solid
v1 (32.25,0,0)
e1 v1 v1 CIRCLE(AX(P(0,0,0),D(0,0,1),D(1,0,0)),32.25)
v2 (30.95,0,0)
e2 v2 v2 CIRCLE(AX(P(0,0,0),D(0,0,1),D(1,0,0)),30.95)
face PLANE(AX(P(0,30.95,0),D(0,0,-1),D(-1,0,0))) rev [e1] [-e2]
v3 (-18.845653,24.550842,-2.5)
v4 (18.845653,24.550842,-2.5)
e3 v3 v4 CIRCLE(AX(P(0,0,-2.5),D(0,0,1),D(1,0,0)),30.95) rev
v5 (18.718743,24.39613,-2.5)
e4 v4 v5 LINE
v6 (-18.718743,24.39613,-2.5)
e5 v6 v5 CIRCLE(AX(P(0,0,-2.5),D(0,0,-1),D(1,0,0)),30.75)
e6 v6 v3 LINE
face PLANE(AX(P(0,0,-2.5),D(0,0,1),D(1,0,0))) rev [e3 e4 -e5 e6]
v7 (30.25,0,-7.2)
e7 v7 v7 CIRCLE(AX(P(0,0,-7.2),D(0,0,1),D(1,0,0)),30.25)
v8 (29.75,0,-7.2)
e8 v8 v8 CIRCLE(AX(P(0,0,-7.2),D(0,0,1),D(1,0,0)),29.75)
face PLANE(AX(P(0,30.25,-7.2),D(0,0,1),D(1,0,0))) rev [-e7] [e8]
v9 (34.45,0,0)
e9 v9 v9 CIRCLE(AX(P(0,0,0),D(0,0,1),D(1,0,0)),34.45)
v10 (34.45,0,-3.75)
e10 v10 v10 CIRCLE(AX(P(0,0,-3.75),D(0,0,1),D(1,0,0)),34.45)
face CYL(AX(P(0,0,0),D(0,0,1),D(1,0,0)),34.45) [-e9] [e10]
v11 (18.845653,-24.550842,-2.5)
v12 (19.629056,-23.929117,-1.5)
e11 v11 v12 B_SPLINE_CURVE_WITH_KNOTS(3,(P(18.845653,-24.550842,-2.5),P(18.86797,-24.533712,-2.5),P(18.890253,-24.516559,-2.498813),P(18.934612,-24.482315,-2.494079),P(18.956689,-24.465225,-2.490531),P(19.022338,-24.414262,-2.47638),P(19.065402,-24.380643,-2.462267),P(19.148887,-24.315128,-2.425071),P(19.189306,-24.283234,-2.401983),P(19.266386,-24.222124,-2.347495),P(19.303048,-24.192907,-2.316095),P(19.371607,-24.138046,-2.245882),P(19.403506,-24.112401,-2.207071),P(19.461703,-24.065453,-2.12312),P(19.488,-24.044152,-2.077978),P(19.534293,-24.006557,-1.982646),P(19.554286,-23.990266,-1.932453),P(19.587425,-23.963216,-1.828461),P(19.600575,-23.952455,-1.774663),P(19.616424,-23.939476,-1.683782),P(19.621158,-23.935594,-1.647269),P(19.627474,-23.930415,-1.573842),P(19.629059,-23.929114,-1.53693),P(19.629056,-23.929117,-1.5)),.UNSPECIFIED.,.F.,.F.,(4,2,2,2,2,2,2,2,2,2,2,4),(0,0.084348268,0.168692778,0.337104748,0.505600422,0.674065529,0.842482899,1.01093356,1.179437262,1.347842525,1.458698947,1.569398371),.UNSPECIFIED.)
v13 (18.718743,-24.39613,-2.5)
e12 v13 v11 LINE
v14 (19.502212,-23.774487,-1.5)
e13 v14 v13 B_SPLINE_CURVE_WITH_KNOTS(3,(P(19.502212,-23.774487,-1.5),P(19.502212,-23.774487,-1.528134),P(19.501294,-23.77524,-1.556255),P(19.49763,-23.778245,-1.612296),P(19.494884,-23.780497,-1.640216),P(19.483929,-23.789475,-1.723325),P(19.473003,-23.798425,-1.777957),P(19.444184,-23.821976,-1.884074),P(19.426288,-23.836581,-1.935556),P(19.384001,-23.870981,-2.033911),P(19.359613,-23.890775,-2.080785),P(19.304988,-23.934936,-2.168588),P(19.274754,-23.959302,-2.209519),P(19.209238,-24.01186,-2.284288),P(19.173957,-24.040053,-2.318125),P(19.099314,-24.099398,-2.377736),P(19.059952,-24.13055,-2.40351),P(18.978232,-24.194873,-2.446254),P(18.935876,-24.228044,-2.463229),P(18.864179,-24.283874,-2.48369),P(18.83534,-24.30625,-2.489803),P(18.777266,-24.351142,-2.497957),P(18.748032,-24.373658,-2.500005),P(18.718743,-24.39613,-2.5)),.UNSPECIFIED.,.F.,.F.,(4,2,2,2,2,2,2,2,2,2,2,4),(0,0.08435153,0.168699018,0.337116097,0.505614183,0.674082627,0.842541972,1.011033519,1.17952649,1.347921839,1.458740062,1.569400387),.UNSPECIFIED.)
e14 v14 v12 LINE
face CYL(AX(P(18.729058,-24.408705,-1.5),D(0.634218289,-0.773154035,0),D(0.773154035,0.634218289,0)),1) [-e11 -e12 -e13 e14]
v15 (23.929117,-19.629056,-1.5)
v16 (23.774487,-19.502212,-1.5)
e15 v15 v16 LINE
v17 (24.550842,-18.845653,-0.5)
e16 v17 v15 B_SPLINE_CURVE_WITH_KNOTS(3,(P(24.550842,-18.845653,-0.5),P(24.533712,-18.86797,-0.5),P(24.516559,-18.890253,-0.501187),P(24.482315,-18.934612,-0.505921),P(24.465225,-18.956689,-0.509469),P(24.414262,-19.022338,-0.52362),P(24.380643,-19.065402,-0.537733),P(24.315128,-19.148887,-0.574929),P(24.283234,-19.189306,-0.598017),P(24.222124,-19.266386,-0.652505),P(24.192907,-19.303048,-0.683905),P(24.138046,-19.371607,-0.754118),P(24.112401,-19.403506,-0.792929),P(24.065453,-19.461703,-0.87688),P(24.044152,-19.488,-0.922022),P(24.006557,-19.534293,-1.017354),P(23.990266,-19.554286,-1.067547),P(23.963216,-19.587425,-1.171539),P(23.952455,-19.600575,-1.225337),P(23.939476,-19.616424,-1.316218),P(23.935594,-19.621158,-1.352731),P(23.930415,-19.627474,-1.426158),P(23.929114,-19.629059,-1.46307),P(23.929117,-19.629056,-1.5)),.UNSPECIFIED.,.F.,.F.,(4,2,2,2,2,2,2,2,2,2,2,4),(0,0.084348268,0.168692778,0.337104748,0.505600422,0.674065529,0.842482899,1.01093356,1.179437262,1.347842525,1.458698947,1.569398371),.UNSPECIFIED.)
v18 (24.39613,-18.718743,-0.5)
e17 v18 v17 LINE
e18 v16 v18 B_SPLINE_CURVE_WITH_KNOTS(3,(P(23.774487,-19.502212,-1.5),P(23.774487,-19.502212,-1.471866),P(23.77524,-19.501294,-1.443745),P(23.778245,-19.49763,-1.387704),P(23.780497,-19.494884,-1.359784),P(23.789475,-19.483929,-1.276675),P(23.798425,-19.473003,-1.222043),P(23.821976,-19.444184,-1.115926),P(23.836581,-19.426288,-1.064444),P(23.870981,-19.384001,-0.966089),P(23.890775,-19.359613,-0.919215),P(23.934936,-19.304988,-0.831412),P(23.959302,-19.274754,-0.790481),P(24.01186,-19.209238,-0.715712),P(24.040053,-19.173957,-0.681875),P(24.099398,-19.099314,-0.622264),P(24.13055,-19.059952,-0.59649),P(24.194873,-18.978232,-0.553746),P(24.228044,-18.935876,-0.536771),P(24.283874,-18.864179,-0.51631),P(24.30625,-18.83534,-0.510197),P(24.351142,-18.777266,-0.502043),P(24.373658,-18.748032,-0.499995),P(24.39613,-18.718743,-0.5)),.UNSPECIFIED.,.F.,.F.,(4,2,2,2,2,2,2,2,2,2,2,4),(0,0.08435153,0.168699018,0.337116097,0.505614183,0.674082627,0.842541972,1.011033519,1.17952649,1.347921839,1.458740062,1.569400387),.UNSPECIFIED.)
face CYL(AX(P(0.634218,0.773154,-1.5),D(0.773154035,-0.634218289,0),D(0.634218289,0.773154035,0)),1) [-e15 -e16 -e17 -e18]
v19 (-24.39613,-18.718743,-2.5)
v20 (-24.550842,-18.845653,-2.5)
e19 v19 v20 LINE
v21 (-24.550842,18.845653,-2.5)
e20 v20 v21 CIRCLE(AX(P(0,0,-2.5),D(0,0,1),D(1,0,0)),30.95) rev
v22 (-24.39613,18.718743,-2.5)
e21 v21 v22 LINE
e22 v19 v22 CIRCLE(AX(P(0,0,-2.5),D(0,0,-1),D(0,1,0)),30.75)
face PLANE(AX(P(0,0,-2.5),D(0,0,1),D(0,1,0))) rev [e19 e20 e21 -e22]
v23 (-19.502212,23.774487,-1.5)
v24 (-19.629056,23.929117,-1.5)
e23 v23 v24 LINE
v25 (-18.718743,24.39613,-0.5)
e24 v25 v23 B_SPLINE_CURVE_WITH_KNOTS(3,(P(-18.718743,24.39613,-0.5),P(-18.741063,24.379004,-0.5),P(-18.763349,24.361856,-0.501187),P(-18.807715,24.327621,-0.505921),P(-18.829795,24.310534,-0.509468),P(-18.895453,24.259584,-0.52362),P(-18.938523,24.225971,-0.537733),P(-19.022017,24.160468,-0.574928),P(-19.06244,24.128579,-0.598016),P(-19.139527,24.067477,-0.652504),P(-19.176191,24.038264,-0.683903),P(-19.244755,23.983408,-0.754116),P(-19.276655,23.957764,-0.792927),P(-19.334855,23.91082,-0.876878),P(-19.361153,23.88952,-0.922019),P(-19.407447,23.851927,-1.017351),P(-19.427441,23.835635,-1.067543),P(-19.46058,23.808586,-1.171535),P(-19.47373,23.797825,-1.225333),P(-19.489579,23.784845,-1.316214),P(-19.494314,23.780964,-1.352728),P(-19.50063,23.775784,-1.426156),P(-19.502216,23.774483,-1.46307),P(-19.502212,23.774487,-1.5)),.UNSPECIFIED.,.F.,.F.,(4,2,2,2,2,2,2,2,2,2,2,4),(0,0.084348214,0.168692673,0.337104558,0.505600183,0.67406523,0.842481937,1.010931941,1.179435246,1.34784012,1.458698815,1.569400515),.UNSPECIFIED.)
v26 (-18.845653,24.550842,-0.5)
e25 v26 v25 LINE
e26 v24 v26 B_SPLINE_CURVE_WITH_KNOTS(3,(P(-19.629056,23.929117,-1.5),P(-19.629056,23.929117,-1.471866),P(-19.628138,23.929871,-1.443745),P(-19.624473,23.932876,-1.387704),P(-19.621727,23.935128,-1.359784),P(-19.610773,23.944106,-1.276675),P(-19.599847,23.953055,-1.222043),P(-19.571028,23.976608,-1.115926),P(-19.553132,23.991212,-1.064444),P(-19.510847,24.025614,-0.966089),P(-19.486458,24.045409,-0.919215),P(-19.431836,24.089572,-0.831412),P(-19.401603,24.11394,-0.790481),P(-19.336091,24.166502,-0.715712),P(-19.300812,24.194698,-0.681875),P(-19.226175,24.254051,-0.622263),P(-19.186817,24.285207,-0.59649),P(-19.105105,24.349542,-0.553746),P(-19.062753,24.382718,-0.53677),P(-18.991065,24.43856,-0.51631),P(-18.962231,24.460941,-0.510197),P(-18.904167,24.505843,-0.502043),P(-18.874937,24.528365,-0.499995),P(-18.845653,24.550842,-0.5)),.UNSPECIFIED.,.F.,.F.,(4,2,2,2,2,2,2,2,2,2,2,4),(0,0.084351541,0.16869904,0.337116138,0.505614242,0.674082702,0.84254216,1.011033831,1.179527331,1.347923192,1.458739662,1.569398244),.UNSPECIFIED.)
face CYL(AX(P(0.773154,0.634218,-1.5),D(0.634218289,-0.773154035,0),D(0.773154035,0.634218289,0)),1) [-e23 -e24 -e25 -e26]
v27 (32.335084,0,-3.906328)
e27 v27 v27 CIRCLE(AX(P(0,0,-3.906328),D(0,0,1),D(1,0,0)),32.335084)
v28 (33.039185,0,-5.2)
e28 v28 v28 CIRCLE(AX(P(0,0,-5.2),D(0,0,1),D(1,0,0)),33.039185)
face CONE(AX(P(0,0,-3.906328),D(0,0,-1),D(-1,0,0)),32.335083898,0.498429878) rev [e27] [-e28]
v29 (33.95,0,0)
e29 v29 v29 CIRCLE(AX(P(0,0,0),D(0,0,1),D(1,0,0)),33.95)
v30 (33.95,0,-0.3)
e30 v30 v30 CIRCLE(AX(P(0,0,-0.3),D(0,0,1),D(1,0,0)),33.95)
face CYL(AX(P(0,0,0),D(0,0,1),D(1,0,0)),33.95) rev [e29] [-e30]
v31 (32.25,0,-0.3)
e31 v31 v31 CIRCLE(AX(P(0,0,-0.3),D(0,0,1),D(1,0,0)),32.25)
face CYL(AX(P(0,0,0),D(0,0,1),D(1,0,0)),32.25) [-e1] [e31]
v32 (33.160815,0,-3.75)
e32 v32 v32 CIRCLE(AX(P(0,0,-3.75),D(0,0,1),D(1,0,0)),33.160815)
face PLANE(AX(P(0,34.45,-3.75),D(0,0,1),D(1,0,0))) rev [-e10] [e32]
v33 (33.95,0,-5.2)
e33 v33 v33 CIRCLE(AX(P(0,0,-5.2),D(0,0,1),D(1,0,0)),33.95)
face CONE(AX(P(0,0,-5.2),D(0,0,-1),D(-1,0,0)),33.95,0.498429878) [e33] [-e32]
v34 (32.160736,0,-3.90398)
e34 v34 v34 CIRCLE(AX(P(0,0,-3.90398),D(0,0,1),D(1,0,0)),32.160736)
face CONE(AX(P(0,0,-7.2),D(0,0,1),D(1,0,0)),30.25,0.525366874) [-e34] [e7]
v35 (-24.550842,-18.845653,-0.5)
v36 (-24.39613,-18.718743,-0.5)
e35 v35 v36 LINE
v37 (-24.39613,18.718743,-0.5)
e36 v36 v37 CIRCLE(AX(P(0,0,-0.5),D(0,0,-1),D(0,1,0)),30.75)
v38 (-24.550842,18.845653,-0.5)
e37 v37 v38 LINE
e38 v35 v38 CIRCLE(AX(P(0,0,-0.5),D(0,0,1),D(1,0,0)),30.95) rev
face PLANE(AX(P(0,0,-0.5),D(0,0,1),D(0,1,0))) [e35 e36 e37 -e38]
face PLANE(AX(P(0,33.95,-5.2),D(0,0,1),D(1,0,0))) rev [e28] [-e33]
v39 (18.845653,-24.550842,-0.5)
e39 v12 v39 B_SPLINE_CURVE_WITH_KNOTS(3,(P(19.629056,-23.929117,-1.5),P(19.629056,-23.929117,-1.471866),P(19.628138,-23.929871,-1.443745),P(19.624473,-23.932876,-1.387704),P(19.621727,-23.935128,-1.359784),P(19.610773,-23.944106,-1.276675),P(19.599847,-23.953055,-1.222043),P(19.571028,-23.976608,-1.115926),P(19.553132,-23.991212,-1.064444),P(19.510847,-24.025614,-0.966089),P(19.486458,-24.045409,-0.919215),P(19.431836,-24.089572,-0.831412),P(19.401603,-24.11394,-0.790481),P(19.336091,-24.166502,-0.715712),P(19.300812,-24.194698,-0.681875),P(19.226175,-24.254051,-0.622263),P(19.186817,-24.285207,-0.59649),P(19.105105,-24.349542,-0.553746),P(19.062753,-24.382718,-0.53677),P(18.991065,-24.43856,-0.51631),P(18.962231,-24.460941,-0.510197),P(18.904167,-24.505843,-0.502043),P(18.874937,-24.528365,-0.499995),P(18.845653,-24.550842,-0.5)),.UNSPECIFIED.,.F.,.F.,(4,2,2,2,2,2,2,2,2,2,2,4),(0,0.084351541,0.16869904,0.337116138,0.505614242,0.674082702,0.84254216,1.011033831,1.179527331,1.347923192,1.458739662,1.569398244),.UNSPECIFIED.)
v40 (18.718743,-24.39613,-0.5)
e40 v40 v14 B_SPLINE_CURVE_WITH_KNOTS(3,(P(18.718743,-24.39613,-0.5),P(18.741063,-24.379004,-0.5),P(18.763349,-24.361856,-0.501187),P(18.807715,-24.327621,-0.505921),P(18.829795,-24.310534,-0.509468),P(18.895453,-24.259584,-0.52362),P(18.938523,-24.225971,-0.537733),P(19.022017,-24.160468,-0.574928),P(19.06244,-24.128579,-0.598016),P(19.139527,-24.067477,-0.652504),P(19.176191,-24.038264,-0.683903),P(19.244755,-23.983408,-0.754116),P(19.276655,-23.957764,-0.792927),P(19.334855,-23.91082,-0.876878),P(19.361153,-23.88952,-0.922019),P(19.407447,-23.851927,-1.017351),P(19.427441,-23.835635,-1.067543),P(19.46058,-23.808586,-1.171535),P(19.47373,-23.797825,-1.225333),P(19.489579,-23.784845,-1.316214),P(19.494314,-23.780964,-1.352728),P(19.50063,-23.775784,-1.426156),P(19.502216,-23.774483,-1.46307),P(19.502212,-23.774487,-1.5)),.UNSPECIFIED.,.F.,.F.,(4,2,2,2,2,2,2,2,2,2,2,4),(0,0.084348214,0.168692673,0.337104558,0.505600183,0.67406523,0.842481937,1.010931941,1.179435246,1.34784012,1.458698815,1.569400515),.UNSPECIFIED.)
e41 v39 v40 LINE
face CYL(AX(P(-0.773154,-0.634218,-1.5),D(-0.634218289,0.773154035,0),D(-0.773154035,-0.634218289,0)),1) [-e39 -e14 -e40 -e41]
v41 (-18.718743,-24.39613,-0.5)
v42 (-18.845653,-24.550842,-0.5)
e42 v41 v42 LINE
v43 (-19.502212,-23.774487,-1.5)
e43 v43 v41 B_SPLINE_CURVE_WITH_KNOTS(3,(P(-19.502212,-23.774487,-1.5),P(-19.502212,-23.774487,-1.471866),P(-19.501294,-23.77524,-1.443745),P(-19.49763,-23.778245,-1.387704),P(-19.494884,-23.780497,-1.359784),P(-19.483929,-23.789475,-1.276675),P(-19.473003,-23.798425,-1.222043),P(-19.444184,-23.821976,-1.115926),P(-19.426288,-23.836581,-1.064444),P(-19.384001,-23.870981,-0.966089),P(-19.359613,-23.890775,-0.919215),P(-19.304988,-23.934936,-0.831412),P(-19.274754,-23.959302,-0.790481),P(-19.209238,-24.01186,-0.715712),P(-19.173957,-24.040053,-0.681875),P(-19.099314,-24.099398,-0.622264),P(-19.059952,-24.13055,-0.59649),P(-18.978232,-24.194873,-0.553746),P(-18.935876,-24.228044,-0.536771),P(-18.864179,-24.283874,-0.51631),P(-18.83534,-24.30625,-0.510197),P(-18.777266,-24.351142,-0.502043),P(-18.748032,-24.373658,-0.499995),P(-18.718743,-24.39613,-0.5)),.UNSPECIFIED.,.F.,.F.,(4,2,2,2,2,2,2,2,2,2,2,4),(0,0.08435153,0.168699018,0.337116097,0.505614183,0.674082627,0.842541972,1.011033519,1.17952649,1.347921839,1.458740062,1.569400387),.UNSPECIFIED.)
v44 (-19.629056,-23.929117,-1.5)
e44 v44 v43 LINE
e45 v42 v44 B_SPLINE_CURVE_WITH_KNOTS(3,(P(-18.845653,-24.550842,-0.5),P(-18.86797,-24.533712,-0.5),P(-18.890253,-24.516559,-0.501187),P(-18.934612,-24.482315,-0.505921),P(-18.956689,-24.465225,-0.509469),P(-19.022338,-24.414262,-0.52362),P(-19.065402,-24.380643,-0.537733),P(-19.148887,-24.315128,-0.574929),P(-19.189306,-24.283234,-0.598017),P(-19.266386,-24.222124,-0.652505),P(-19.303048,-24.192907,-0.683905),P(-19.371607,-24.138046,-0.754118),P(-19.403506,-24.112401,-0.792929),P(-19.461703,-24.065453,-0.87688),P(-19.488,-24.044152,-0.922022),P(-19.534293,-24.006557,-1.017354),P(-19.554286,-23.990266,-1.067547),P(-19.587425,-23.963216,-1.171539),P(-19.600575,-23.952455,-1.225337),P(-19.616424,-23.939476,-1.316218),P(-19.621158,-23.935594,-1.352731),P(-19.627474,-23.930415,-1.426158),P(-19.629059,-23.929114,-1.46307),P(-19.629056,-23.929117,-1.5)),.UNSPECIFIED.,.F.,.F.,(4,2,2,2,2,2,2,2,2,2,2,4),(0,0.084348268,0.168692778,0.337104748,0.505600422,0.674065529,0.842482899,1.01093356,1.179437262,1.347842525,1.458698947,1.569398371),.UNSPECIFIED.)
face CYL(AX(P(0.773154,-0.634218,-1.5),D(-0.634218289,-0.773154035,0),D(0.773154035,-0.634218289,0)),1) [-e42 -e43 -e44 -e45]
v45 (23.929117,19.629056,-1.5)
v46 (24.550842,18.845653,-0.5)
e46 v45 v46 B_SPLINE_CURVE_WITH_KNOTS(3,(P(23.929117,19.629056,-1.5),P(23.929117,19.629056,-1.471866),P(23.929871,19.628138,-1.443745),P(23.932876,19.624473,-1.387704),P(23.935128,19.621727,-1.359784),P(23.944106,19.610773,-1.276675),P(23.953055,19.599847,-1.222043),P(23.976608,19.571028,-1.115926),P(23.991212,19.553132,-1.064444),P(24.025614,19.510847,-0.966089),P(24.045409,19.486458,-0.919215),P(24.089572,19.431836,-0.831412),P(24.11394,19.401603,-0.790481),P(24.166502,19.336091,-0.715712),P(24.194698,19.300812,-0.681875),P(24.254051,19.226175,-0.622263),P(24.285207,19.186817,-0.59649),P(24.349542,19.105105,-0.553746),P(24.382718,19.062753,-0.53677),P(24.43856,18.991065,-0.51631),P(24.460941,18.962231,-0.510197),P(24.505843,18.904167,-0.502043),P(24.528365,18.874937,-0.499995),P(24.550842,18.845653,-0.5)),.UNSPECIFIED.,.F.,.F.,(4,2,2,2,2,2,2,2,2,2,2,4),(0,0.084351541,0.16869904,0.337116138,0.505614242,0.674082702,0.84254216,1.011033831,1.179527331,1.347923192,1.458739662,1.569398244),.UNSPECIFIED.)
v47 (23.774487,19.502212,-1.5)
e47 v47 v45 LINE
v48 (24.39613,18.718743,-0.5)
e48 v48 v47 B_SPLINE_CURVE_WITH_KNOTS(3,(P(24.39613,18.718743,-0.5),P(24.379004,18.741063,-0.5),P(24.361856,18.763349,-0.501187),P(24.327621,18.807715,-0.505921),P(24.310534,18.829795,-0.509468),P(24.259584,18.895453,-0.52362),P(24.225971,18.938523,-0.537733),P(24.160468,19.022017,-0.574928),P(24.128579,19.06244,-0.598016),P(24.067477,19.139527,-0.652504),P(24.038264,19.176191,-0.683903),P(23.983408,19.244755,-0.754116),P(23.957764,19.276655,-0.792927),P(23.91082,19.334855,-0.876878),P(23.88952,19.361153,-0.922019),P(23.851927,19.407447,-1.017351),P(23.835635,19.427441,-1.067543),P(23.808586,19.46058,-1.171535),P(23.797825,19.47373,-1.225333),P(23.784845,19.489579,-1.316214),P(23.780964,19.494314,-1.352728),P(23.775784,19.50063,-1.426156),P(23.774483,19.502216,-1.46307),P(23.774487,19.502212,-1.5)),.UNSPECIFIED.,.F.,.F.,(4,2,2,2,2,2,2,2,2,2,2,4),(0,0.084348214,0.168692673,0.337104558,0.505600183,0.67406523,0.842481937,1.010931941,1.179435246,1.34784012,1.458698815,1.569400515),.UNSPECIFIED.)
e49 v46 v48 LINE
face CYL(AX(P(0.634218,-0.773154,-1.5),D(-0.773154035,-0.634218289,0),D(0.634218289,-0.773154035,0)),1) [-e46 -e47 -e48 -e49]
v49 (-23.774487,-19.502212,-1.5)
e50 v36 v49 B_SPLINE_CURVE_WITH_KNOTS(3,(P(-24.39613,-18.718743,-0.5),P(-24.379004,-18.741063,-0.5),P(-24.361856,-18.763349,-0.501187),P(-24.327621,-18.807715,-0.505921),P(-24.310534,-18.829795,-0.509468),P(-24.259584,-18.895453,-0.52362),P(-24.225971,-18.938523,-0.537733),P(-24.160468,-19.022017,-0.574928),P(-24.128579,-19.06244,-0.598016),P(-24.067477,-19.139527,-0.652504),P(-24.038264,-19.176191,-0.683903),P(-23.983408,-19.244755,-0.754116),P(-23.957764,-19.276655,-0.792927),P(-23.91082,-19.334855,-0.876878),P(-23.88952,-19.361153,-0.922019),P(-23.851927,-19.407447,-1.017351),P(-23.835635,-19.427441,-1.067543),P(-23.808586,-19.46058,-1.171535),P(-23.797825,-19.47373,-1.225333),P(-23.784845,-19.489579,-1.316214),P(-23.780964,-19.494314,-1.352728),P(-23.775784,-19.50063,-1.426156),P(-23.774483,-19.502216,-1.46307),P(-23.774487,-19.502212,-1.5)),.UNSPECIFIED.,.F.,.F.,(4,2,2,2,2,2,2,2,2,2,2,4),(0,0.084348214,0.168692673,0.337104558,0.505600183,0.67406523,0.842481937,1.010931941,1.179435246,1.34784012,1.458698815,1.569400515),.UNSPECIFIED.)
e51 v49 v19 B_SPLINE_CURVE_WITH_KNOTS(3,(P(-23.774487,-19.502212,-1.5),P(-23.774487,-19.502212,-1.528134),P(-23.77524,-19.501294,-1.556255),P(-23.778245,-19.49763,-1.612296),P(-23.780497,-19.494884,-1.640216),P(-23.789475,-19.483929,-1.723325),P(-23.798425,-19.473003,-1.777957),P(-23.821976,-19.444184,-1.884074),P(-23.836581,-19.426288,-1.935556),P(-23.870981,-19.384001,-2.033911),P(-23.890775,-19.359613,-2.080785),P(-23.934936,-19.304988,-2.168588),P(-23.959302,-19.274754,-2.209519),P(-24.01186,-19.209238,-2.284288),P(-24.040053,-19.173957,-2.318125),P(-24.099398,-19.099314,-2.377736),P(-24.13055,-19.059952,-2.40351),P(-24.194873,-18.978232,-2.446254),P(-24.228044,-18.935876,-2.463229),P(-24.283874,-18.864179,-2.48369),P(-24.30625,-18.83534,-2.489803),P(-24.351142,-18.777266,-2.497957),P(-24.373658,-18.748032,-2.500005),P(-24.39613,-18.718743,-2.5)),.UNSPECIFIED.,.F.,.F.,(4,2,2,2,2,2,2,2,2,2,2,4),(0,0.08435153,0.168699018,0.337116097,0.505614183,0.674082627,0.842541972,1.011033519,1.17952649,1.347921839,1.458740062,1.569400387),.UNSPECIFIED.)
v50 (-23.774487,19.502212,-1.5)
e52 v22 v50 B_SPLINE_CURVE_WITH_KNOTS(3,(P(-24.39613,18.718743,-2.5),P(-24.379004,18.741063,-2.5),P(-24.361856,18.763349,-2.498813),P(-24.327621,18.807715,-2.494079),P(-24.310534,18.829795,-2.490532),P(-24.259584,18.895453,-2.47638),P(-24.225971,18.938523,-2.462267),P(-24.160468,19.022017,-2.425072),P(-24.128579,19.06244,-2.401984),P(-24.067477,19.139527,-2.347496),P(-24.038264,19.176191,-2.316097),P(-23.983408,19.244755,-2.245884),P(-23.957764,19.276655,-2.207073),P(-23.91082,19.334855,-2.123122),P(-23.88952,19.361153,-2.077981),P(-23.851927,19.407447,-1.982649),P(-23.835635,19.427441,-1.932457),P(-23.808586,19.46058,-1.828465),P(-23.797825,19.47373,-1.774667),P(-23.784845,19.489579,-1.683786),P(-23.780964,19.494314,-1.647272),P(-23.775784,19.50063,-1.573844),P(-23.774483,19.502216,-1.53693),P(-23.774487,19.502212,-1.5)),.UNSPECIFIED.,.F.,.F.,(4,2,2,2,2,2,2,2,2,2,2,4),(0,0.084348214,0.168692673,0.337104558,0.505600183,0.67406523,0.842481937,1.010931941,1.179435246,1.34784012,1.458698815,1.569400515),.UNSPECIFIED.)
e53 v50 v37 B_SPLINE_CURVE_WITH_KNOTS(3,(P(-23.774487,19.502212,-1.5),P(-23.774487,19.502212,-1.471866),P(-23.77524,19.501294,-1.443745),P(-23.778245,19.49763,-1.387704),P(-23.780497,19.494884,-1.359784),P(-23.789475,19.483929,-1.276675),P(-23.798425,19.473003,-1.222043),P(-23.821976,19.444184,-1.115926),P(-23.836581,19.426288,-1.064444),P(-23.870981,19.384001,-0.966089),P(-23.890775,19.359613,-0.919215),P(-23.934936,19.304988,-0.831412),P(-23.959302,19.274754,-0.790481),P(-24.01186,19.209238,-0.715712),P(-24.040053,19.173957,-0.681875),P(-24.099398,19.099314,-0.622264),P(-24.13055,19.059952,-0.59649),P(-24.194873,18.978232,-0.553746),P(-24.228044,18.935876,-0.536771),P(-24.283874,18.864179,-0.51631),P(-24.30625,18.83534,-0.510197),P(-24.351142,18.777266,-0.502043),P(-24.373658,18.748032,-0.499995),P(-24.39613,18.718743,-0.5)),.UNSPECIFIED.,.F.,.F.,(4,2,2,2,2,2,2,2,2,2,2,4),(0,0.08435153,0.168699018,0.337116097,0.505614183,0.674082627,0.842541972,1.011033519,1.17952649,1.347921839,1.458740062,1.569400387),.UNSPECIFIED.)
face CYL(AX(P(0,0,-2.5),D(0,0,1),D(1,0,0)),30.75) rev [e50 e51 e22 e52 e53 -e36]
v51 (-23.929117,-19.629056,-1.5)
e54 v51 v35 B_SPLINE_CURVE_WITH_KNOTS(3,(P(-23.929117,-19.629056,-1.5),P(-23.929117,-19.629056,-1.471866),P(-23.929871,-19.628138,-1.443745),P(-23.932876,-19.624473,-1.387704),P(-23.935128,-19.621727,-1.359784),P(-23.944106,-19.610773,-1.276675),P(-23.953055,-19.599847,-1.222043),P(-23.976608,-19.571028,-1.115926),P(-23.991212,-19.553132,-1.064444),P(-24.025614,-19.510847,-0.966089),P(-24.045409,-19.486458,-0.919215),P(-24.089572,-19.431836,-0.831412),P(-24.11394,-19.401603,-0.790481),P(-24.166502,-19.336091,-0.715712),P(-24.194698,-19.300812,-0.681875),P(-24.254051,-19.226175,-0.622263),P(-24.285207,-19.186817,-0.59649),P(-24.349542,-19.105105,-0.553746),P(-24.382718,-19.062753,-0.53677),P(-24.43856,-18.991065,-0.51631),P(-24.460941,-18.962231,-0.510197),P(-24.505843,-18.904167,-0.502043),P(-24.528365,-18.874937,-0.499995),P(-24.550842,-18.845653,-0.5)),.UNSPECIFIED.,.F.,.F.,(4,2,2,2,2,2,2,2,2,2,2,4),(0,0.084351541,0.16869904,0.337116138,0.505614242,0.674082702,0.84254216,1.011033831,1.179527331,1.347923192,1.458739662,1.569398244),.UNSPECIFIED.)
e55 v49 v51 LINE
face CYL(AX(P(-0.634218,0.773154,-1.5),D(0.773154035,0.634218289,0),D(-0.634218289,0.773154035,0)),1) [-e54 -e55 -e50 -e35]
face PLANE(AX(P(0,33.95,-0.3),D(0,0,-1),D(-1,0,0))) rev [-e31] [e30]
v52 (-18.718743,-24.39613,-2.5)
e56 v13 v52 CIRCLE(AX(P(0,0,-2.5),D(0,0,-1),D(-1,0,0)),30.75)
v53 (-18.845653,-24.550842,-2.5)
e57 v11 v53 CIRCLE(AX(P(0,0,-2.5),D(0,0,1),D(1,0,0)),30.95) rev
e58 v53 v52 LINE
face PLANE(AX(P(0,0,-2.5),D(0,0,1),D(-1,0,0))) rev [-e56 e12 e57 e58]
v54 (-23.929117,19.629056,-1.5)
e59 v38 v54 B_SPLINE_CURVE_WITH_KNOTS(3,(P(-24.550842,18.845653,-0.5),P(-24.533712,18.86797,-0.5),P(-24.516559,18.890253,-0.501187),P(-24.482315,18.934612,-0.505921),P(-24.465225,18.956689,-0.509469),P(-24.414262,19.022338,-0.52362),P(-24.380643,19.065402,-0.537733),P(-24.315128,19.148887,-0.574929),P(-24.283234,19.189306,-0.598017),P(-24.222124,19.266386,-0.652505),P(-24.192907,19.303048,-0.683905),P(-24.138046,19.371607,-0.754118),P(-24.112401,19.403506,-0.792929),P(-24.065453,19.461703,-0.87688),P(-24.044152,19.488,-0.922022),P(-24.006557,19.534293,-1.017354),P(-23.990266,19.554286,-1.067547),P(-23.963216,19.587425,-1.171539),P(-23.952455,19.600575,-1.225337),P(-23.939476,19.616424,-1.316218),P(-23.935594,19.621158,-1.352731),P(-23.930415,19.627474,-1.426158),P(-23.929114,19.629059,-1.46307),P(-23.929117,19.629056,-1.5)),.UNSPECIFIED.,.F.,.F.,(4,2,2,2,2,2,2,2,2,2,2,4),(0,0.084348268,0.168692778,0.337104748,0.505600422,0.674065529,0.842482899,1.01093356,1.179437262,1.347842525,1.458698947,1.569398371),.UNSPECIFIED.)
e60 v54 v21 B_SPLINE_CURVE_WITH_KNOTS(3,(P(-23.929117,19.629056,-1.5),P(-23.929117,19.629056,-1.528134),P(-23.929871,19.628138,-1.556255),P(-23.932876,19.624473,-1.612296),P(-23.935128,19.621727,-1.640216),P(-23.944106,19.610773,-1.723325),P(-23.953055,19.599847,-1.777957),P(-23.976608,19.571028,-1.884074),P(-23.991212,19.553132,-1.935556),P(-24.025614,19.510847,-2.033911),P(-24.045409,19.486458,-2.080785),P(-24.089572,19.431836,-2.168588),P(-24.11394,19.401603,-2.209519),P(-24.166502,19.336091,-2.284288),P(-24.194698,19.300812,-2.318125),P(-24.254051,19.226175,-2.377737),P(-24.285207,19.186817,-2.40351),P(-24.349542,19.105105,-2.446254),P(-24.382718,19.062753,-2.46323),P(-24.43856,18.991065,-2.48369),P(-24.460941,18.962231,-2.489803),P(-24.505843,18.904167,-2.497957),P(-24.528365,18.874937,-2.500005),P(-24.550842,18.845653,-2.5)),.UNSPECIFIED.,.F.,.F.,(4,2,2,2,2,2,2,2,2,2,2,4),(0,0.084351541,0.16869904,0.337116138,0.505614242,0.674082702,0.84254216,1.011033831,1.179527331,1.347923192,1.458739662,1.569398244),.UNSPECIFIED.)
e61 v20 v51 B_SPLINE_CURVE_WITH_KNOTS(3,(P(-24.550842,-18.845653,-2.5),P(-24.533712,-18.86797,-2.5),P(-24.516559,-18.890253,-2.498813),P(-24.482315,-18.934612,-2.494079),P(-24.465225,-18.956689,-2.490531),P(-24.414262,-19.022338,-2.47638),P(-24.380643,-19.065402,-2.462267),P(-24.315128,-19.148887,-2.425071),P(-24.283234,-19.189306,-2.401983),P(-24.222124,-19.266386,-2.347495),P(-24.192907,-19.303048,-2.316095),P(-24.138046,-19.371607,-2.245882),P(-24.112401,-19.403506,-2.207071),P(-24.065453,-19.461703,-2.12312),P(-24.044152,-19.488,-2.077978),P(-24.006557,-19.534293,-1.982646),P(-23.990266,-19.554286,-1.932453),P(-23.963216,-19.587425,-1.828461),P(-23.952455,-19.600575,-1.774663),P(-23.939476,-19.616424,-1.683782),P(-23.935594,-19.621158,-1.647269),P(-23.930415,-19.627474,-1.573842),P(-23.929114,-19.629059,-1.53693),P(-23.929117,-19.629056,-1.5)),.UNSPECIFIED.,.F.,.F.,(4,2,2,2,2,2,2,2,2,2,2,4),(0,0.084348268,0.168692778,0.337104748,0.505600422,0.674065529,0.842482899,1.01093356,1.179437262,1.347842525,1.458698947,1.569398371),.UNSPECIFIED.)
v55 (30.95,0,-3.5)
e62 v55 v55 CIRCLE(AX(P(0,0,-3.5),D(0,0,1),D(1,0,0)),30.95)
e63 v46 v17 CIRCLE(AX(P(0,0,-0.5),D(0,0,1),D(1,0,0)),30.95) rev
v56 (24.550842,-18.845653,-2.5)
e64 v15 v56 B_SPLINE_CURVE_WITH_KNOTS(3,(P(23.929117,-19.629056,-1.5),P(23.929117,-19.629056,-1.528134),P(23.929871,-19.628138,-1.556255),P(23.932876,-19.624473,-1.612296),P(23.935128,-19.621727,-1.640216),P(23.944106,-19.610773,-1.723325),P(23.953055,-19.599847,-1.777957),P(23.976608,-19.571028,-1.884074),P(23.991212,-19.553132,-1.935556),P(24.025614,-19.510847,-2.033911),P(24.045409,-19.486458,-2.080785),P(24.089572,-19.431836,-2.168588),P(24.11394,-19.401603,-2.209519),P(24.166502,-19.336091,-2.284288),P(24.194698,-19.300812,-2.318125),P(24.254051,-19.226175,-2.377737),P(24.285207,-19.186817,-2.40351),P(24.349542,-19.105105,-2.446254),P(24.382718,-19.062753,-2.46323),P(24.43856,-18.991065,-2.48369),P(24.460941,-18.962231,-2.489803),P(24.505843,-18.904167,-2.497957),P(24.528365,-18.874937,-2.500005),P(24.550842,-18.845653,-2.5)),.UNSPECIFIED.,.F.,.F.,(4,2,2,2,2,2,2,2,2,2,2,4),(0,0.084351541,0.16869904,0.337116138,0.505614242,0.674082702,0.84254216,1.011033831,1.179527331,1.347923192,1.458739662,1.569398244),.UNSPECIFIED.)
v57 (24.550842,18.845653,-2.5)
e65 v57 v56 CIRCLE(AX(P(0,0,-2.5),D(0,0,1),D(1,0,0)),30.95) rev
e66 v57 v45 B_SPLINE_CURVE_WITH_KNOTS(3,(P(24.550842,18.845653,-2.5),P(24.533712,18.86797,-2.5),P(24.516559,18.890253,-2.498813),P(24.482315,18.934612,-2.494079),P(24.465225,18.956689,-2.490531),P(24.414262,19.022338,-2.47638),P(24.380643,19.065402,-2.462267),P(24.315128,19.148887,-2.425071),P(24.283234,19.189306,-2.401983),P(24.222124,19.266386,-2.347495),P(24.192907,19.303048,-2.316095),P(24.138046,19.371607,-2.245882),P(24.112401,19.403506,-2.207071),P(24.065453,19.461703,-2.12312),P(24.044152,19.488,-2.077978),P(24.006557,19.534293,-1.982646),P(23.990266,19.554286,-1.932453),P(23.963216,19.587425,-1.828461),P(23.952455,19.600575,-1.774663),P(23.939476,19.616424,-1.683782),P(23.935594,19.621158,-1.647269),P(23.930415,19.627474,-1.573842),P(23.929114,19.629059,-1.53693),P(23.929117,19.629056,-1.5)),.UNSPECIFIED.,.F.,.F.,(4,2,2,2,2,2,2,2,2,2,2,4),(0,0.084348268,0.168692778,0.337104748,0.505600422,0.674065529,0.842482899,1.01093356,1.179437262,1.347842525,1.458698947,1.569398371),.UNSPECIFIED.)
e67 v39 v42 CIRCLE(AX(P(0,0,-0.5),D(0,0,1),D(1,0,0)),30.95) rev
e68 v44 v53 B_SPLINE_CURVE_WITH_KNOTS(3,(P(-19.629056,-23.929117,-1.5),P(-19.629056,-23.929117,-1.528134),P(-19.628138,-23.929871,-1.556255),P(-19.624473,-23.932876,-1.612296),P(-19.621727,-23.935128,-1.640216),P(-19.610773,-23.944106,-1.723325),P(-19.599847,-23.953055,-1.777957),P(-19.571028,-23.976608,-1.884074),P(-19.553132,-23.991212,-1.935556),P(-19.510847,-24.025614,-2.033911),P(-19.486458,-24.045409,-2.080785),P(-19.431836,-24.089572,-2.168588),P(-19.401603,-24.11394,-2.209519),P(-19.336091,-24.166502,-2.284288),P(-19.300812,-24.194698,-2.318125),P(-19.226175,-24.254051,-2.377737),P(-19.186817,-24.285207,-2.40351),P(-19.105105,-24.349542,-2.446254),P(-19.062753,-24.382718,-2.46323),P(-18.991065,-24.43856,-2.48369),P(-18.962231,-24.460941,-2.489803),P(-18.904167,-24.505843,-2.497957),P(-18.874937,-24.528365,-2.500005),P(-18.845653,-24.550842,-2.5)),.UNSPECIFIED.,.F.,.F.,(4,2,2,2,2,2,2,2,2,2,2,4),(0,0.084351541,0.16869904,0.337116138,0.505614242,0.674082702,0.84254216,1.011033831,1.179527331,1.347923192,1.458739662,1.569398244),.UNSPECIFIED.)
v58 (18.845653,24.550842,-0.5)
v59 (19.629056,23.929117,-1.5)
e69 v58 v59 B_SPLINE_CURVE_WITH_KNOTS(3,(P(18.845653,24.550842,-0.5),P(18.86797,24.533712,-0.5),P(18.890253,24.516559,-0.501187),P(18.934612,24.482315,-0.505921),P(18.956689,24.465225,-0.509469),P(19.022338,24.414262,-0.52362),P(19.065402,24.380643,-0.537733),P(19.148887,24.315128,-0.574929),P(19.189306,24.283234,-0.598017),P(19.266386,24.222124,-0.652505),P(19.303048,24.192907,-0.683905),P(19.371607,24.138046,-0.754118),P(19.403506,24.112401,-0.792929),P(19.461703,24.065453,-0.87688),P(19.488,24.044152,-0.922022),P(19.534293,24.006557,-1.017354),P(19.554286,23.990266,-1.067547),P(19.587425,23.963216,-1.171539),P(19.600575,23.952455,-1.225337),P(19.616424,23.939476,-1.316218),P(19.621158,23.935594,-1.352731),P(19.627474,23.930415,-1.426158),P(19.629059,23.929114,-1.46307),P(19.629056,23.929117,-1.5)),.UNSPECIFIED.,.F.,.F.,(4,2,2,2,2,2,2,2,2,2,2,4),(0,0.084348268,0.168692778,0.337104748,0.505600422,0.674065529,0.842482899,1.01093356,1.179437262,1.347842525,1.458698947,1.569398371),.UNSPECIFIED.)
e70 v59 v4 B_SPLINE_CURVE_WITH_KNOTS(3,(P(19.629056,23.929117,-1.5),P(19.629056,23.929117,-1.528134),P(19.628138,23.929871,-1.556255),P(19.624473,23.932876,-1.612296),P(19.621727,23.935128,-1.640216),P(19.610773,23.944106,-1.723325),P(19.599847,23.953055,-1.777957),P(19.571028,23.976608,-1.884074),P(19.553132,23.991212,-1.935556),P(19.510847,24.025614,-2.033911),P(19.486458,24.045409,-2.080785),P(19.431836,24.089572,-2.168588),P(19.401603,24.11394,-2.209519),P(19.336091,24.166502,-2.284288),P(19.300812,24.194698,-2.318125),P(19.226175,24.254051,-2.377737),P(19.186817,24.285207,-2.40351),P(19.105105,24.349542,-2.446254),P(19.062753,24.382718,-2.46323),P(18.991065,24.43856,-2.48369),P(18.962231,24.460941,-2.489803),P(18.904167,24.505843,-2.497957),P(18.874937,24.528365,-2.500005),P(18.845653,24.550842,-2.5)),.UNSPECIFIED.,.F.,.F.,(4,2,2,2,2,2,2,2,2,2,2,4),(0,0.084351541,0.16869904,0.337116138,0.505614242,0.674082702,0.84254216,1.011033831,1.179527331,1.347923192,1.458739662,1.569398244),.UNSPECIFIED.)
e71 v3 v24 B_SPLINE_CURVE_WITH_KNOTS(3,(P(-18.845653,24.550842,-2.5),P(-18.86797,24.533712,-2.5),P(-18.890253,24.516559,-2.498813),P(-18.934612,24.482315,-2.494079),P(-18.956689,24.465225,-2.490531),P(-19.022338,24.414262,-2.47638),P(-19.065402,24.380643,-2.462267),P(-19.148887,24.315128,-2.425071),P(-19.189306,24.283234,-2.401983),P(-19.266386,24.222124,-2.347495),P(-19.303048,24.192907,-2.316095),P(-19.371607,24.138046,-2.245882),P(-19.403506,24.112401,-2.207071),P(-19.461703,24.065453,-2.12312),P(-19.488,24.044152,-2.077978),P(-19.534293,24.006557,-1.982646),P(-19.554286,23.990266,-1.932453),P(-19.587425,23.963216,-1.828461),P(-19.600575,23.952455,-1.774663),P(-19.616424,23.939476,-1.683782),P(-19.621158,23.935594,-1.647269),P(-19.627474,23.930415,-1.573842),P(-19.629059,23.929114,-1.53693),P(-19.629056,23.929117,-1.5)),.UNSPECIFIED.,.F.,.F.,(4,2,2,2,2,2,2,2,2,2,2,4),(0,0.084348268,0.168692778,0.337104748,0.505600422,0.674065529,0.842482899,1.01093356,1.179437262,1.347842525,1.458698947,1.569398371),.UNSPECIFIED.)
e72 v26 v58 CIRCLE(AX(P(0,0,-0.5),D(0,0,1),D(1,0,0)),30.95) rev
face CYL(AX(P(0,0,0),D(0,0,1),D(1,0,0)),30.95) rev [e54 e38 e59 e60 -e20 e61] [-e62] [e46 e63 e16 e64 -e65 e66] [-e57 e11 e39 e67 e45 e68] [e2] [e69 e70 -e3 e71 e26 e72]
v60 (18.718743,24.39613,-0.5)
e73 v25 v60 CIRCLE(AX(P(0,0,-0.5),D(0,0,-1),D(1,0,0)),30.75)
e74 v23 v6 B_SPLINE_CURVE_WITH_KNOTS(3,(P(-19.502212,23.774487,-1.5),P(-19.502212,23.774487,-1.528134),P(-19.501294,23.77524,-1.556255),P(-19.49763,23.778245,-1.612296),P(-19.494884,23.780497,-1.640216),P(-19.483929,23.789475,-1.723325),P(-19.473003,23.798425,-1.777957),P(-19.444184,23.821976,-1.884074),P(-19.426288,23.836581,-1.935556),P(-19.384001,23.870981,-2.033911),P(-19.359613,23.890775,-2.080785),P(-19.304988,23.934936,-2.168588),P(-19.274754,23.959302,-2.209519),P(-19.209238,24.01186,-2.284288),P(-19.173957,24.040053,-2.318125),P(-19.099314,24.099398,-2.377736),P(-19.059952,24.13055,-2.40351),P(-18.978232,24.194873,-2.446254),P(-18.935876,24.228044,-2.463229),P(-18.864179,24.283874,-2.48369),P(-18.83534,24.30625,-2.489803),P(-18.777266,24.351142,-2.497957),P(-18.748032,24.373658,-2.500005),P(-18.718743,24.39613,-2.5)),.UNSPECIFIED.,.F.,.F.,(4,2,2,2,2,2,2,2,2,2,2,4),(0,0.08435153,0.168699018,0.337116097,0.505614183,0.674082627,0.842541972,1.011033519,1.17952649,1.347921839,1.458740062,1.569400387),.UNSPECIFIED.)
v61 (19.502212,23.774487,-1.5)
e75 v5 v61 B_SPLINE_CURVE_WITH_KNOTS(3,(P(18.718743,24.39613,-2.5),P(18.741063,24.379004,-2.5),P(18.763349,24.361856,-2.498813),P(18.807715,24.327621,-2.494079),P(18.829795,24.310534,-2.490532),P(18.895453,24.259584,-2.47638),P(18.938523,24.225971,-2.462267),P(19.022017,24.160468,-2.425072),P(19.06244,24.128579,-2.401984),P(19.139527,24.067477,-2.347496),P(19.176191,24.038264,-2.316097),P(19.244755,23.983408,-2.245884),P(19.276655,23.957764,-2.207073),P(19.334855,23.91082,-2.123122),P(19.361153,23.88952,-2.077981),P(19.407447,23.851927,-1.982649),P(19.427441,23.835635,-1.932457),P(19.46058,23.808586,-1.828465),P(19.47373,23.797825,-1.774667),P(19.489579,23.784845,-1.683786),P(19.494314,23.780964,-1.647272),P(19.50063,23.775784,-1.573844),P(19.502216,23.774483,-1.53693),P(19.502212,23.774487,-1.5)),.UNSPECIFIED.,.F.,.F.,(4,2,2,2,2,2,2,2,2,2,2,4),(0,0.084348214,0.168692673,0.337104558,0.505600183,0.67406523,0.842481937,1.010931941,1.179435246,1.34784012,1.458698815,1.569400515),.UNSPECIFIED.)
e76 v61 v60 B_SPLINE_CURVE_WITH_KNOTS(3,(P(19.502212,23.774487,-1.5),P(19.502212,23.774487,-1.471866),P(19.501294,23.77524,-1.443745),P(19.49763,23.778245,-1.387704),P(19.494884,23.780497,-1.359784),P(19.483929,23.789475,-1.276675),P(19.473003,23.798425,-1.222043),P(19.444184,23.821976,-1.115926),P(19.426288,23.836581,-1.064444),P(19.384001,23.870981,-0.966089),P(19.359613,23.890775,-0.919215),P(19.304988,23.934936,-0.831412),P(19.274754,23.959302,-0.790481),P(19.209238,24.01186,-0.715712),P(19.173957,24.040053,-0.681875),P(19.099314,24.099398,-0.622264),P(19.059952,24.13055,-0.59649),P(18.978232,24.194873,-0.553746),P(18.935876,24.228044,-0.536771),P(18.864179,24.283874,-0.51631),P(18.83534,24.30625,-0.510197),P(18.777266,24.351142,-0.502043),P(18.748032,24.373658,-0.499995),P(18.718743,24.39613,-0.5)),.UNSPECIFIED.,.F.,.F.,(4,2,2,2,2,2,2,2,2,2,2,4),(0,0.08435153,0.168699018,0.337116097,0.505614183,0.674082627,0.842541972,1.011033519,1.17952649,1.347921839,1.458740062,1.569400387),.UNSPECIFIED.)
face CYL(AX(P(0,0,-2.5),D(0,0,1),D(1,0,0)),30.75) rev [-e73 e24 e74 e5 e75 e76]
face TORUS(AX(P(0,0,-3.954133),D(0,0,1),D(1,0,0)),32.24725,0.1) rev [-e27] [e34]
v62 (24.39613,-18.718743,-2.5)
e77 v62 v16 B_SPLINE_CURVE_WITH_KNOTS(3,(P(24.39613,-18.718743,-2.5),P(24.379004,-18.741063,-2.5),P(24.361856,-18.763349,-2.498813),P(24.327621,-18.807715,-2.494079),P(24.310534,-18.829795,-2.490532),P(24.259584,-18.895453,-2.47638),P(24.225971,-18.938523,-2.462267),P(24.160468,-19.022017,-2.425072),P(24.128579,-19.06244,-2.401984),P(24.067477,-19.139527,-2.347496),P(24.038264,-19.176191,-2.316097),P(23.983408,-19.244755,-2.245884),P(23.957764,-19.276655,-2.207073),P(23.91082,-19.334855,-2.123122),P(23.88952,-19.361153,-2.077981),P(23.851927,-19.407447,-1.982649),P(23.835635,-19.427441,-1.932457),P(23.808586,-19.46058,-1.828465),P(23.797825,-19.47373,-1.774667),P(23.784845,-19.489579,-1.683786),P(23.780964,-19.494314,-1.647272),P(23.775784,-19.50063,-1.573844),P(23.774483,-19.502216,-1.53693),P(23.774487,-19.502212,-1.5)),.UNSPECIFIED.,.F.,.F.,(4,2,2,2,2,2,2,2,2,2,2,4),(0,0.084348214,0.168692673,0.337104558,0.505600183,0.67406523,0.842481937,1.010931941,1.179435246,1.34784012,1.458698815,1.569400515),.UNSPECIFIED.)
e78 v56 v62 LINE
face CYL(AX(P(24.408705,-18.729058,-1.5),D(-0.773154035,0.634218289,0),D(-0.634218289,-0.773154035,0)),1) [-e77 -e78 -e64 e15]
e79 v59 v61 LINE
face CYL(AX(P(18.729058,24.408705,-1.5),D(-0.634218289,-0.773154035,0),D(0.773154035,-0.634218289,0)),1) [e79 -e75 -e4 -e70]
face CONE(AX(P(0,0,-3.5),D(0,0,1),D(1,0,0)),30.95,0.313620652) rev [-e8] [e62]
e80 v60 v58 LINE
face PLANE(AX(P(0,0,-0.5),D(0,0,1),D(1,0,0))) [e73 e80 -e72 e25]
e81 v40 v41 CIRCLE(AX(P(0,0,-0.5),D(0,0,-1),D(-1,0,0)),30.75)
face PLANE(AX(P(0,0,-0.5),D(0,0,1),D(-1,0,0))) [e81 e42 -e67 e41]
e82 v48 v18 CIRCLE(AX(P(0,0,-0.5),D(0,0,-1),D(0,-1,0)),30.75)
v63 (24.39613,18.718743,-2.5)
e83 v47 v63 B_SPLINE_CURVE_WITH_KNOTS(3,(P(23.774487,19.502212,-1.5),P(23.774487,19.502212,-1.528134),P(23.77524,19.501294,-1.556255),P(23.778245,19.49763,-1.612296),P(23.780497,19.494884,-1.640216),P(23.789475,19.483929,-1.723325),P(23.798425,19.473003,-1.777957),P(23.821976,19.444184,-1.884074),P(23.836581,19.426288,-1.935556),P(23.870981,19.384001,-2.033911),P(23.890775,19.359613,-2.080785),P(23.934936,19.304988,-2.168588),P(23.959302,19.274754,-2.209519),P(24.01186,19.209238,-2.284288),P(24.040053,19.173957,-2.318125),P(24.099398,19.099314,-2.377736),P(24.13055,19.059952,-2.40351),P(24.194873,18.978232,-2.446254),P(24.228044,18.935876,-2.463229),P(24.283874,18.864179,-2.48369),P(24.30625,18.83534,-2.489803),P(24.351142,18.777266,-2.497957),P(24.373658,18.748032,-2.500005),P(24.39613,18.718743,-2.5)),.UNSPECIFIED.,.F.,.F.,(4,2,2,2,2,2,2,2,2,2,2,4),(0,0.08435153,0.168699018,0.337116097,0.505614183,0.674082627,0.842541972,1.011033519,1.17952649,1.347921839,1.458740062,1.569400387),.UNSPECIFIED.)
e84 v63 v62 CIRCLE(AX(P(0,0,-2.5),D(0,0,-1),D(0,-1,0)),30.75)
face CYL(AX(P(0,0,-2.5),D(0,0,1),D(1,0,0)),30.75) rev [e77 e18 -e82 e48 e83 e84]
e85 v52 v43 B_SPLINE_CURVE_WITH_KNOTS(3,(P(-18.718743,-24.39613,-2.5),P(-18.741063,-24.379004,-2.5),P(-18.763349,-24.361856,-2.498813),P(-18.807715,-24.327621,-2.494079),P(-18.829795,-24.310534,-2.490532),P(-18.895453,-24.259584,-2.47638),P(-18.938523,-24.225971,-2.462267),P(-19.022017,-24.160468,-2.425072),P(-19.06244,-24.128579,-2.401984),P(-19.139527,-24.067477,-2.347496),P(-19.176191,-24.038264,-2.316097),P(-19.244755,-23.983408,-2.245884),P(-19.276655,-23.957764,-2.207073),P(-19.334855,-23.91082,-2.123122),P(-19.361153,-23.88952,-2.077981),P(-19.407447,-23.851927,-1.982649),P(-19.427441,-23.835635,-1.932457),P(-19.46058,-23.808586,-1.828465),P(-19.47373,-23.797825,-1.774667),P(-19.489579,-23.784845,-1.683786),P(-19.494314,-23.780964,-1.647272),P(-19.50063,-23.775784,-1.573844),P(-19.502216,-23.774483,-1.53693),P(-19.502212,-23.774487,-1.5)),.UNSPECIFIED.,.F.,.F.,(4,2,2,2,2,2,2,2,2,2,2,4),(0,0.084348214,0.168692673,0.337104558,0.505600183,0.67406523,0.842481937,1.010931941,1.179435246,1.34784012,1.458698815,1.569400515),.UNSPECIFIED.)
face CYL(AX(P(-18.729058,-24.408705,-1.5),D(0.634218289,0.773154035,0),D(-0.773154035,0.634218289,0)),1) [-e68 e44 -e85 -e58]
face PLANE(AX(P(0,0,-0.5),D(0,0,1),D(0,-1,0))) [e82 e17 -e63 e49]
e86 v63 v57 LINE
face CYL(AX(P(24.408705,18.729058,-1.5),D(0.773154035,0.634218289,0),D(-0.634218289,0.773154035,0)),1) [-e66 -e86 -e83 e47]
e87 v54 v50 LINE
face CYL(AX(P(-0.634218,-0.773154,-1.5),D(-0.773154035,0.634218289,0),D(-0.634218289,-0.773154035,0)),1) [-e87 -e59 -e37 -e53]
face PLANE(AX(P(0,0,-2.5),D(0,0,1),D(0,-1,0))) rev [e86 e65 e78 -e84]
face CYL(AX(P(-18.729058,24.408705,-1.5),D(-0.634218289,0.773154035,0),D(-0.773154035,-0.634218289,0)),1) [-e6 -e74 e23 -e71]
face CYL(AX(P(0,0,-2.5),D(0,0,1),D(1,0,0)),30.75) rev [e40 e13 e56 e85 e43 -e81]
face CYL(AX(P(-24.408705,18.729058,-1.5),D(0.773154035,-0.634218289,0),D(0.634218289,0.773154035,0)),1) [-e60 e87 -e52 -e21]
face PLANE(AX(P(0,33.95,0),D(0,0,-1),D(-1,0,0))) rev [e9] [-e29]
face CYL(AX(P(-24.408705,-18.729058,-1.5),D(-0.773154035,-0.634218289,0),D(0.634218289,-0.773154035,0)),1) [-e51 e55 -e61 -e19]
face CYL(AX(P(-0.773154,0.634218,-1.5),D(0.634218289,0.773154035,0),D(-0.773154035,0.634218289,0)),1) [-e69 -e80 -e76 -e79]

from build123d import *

# Parameters (mm, degrees)
BOSS_EXTRUDE1_DEPTH      = 2
FILLET1_R                = 1
CIRPATTERN1_COUNT        = 4
FILLET1_OF_CIRPATTERN1_R = 1


with BuildPart() as part:
    # Sketch1 → Revolve1 (revolve)
    with BuildSketch(Plane(origin=(0, 0, 0), x_dir=(0, 0, -1), z_dir=(1, 0, 0)), mode=Mode.PRIVATE) as revolve1_sk:
        with BuildLine():
            Line((3.75, 34.45), (3.75, 33.95))
            Line((3.75, 33.95), (3.75, 33.160815003))
            Line((3.75, 33.160815003), (5.2, 33.95))
            Line((5.2, 33.95), (5.2, 33.039184997))
            Line((5.2, 33.039184997), (3.906327923, 32.335083898))
            ThreePointArc((3.906327923, 32.335083898), (3.854141696, 32.248597283), (3.903979583, 32.160736474))
            Line((3.903979583, 32.160736474), (7.2, 30.25))
            Line((7.2, 30.25), (7.2, 29.75))
            Line((7.2, 29.75), (3.5, 30.95))
            Line((3.5, 30.95), (0, 30.95))
            Line((0, 30.95), (0, 32.25))
            Line((0, 32.25), (0.3, 32.25))
            Line((0.3, 32.25), (0.3, 33.95))
            Line((0.3, 33.95), (0, 33.95))
            Line((0, 33.95), (0, 34.45))
            Line((0, 34.45), (3.75, 34.45))
        make_face()
    revolve(revolve1_sk.sketch.rotate(Axis((0, 0, 0), (0, 0, -1)), 90), axis=Axis((0, 0, 0), (0, 0, -1)))

    # Sketch2 → Boss-Extrude1 (add)
    with BuildSketch(Plane.XY.offset(-0.5)):
        with BuildLine():
            Line((-19.502212389, 23.774486575), (-21.5, 26.209921785))
            ThreePointArc((-21.5, 26.209921785), (0, 33.9), (21.5, 26.209921785))
            Line((21.5, 26.209921785), (19.502212389, 23.774486575))
            ThreePointArc((19.502212389, 23.774486575), (0, 30.75), (-19.502212389, 23.774486575))
        make_face()
    boss_extrude1 = extrude(amount=-BOSS_EXTRUDE1_DEPTH)

    # Fillet1
    fillet1_edges = [part.edges().sort_by_distance(p)[0] for p in [
        (-19.565634218, 23.851801979, -2.5),
        (-19.565634218, 23.851801979, -0.5),
        (19.565634218, 23.851801979, -2.5),
        (19.565634218, 23.851801979, -0.5),
    ]]
    fillet(fillet1_edges, radius=FILLET1_R - 0.0001)  # a hair under: the kernel refuses the full size

    # CirPattern1: Boss-Extrude1 ×4 about axis
    cirpattern1_axis = Axis((0, 0, 0), (0, 0, 1))
    for i in range(1, CIRPATTERN1_COUNT):
        add(boss_extrude1.rotate(cirpattern1_axis, i * 360 / CIRPATTERN1_COUNT))

    # Fillet1 of CirPattern1
    fillet1_of_cirpattern1_edges = [part.edges().sort_by_distance(p)[0] for p in [
        (-23.851801979, -19.565634218, -2.5),
        (-23.851801979, -19.565634218, -0.5),
        (-23.851801979, 19.565634218, -2.5),
        (-23.851801979, 19.565634218, -0.5),
        (19.565634218, -23.851801979, -2.5),
        (19.565634218, -23.851801979, -0.5),
        (-19.565634218, -23.851801979, -2.5),
        (-19.565634218, -23.851801979, -0.5),
        (23.851801979, 19.565634218, -2.5),
        (23.851801979, 19.565634218, -0.5),
        (23.851801979, -19.565634218, -2.5),
        (23.851801979, -19.565634218, -0.5),
    ]]
    fillet(fillet1_of_cirpattern1_edges, radius=FILLET1_OF_CIRPATTERN1_R - 0.0001)  # a hair under: the kernel refuses the full size


solid = part.part
